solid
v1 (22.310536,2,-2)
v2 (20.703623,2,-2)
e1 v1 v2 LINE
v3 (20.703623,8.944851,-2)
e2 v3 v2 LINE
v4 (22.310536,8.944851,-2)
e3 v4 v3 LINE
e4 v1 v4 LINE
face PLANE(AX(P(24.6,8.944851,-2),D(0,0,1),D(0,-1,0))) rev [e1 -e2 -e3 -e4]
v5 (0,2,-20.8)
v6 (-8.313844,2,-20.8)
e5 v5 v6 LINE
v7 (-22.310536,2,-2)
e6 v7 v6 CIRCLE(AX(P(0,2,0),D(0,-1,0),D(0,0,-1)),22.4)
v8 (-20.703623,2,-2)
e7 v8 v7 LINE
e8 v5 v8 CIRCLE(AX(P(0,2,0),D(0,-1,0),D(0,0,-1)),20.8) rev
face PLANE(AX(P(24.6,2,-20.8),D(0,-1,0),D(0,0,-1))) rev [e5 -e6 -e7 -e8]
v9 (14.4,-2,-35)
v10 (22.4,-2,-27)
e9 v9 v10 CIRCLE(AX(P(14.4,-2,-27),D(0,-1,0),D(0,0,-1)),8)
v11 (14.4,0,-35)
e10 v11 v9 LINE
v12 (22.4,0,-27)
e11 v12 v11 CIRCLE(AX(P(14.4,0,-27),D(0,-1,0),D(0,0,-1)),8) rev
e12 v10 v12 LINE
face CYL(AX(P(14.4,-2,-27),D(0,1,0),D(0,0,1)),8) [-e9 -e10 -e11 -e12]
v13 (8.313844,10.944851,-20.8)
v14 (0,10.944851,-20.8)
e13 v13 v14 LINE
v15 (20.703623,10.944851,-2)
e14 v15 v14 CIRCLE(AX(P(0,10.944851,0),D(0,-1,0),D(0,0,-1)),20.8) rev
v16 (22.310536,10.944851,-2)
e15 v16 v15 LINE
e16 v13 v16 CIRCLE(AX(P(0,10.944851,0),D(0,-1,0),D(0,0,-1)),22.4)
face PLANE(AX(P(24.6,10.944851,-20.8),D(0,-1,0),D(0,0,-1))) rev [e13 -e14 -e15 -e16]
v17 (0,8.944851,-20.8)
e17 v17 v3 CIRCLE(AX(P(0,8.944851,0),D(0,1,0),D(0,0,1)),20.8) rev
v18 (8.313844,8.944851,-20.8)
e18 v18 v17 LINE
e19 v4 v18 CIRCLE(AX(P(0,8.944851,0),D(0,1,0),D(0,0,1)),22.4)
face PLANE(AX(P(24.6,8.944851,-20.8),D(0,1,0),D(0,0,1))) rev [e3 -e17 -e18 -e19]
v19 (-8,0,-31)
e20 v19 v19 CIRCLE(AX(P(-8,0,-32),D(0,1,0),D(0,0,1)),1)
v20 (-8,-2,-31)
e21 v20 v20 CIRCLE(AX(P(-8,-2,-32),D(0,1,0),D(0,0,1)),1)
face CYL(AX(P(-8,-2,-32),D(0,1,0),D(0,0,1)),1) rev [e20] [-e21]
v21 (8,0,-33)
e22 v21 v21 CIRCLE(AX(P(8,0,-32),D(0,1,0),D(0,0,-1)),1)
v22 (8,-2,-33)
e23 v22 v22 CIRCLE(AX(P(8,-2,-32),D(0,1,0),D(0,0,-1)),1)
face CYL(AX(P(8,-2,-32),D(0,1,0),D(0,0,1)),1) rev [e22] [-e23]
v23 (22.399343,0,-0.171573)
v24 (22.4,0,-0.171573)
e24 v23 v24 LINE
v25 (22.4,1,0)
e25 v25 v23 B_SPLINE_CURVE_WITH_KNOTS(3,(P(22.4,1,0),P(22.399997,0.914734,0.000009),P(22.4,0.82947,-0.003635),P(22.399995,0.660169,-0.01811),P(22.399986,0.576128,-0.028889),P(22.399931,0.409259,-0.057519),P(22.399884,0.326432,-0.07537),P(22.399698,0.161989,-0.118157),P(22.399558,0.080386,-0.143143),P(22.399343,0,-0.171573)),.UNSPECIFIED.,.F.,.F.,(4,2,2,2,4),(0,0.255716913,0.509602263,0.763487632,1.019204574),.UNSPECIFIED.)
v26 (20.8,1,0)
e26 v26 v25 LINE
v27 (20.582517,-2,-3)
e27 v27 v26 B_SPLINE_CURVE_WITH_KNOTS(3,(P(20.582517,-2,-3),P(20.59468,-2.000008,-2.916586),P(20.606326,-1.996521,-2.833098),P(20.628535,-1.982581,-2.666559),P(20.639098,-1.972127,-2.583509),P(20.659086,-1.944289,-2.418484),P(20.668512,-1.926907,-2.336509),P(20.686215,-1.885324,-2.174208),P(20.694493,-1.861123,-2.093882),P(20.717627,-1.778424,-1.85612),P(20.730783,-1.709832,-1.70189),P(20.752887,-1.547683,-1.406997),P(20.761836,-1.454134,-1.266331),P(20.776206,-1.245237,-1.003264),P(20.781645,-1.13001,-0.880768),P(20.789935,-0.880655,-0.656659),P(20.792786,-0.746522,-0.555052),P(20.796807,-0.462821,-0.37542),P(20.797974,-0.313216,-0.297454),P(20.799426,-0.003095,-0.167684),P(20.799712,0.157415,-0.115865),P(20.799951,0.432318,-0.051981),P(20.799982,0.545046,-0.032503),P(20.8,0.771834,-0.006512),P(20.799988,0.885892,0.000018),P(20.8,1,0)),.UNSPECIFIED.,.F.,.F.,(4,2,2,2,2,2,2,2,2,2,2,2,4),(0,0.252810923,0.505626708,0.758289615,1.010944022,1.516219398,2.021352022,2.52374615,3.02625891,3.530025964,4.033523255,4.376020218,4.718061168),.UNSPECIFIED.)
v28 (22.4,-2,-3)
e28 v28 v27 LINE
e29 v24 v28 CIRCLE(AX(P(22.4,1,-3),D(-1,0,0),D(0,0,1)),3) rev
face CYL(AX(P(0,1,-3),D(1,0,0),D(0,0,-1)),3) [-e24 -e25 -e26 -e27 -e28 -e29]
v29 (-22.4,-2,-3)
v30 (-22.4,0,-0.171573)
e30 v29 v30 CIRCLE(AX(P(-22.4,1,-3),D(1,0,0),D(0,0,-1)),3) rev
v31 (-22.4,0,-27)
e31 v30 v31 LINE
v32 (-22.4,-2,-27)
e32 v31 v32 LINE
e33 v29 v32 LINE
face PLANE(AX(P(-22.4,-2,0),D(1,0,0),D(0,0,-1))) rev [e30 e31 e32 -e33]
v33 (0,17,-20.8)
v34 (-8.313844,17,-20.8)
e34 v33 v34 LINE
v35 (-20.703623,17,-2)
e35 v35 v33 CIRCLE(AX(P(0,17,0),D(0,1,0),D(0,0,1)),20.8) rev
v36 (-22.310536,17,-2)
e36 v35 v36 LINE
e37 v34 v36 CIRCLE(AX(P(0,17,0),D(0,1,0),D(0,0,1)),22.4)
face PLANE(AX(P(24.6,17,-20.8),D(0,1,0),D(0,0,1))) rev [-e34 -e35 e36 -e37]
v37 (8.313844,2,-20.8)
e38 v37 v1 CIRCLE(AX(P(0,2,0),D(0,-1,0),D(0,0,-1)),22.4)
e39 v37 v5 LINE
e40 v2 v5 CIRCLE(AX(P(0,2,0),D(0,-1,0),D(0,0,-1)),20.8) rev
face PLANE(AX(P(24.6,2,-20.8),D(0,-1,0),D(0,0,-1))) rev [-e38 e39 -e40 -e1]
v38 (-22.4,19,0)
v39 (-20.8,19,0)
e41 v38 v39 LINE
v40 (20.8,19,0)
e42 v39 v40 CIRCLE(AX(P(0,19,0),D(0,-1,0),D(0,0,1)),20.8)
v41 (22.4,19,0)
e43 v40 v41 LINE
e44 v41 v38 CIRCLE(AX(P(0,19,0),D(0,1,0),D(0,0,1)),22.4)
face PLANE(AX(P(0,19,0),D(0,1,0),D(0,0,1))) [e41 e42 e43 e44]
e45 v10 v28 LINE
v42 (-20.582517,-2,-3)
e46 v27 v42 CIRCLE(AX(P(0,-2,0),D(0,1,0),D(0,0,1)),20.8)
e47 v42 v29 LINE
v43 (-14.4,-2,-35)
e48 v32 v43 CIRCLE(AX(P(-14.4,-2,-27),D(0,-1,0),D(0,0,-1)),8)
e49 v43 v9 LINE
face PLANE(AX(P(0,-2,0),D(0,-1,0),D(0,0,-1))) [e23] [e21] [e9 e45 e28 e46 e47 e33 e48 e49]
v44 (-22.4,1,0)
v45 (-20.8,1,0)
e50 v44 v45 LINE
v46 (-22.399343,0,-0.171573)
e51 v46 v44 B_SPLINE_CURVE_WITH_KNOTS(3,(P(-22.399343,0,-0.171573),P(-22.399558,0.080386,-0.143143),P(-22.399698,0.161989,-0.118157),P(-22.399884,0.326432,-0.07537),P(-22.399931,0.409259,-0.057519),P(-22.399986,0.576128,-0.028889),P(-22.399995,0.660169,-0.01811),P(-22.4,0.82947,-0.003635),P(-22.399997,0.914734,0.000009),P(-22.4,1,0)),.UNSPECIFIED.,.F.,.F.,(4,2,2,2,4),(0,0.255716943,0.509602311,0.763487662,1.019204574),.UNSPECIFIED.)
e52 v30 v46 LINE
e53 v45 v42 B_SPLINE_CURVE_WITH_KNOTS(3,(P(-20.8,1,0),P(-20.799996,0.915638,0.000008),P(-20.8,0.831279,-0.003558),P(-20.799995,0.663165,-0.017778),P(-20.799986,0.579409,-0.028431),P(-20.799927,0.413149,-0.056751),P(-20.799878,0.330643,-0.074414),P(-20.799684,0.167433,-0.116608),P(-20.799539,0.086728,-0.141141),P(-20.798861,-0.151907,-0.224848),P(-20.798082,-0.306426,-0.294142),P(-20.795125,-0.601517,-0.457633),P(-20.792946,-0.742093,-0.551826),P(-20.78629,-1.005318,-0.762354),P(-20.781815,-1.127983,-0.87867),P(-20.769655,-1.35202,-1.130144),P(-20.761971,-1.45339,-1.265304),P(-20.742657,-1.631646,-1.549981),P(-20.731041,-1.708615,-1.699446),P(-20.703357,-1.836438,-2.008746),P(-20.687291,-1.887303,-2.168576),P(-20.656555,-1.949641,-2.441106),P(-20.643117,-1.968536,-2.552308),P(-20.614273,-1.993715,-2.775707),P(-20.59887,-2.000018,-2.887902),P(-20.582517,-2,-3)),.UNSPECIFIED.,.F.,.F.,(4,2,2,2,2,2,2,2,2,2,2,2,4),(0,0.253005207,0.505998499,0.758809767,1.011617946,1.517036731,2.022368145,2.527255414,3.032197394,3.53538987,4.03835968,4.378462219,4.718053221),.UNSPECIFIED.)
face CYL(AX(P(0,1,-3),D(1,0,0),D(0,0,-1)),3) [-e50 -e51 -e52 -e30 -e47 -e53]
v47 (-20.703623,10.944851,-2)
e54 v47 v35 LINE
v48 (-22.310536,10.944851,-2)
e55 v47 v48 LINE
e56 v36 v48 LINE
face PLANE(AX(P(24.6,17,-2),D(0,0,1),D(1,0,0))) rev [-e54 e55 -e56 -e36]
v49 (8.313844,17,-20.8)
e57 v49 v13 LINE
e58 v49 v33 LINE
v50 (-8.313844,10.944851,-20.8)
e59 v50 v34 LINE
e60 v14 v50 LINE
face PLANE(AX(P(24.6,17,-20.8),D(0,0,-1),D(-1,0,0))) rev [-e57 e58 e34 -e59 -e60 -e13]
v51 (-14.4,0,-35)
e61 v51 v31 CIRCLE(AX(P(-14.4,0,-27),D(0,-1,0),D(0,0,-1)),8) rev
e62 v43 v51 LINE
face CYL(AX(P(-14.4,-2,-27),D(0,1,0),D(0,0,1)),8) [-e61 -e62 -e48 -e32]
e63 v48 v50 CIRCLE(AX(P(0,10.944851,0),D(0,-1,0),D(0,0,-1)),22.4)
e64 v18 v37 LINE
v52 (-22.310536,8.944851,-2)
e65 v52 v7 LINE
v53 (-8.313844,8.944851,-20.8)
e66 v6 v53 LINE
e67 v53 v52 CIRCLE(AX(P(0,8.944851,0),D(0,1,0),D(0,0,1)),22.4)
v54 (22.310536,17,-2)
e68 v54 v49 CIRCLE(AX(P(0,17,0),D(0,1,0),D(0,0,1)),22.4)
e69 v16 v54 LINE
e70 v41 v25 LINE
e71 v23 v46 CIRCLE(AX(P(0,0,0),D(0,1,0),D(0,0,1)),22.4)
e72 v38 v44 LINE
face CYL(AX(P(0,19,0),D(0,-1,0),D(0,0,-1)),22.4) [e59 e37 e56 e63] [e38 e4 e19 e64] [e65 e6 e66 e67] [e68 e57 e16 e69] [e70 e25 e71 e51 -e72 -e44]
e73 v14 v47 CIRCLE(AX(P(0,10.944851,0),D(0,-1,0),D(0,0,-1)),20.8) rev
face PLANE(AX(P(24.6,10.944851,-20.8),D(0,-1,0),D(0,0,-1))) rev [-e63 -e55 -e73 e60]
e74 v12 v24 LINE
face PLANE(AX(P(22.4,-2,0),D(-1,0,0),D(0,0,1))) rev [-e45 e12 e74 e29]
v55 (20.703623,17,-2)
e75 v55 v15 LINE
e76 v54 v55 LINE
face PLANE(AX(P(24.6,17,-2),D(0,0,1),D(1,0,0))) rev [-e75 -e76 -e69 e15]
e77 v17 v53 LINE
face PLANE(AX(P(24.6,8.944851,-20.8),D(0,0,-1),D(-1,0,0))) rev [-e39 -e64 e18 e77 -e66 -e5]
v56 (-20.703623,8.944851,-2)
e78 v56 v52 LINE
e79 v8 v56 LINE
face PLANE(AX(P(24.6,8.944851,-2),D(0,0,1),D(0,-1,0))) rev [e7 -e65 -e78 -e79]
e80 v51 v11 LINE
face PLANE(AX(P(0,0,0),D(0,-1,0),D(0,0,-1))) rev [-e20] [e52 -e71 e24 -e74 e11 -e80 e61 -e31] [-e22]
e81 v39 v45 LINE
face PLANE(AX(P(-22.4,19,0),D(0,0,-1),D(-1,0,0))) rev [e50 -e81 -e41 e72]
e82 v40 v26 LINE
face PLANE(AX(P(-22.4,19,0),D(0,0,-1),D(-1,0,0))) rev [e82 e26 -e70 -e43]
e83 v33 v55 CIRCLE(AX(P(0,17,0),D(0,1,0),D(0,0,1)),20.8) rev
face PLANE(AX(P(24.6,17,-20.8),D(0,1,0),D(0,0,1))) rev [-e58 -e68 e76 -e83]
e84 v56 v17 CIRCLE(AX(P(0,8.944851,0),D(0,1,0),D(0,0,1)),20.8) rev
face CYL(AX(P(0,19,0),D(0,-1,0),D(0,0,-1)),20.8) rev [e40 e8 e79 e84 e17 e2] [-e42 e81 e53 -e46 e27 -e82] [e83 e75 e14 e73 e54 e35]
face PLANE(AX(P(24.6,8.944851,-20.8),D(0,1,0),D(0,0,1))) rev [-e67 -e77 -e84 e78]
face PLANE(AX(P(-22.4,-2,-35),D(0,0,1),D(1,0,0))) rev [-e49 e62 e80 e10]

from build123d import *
from build123d.topology import SkipClean

# Parameters (mm, degrees)
BOSS_EXTRUDE1_DEPTH = 19
SKETCH2_W           = 44.8
SKETCH2_H           = 35
BOSS_EXTRUDE2_DEPTH = 2
CUT_EXTRUDE1_START  = -2
SKETCH3_R           = 20.8
CUT_EXTRUDE1_DEPTH  = 2
SKETCH4_R           = 1
CUT_EXTRUDE2_DEPTH  = 2
FILLET1_R           = 8
SKETCH5_W           = 18.8
SKETCH5_H           = 6.055148909
SKETCH5_H_2         = 6.944851091
CUT_EXTRUDE3_DEPTH  = 47
FILLET2_START       = -23
FILLET2_DEPTH       = 46


with BuildPart() as part:
    # Sketch1 → Boss-Extrude1 (new body)
    with BuildSketch(Plane(origin=(0, 0, 0), x_dir=(1, 0, 0), z_dir=(0, 1, 0))):
        with BuildLine():
            Line((-22.4, 0), (-20.8, 0))
            ThreePointArc((-20.8, 0), (0, 20.8), (20.8, 0))
            Line((20.8, 0), (22.4, 0))
            ThreePointArc((22.4, 0), (0, 22.4), (-22.4, 0))
        make_face()
    extrude(amount=BOSS_EXTRUDE1_DEPTH)

    # Sketch2 → Boss-Extrude2 (add)
    with BuildSketch(Plane.XZ):
        with Locations((0, -17.5)):
            Rectangle(SKETCH2_W, SKETCH2_H)
    extrude(amount=BOSS_EXTRUDE2_DEPTH)

    # Sketch3 → Cut-Extrude1 (cut)
    with SkipClean():  # the faces are left unmerged after this step: merging them gives an invalid solid
        with BuildSketch(Plane(origin=(0, 0, 0), x_dir=(1, 0, 0), z_dir=(0, 1, 0)).offset(CUT_EXTRUDE1_START)):
            Circle(SKETCH3_R)
        extrude(amount=CUT_EXTRUDE1_DEPTH, mode=Mode.SUBTRACT)
    add(part.part.scale(1), mode=Mode.REPLACE)  # the faces are merged on a copy

    # Sketch4 → Cut-Extrude2 (cut)
    with BuildSketch(Plane(origin=(0, 0, 0), x_dir=(1, 0, 0), z_dir=(0, 1, 0))):
        with Locations(Location((-8, 32, 0), (0, 0, 270))):
            Circle(SKETCH4_R)
        with Locations(Location((8, 32, 0), (0, 0, 90))):
            Circle(SKETCH4_R)
    extrude(amount=-CUT_EXTRUDE2_DEPTH, mode=Mode.SUBTRACT)

    # Fillet1
    fillet1_edges = [part.edges().sort_by_distance(p)[0] for p in [
        (-22.4, -1, -35),
        (22.4, -1, -35),
    ]]
    fillet(fillet1_edges, radius=FILLET1_R)

    # Sketch5 → Cut-Extrude3 (cut)
    with BuildSketch(Plane.ZY.offset(22.4)):
        with Locations((-11.4, 13.972425546)):
            Rectangle(SKETCH5_W, SKETCH5_H)
        with Locations((-11.4, 5.472425546)):
            Rectangle(SKETCH5_W, SKETCH5_H_2)
    extrude(amount=-CUT_EXTRUDE3_DEPTH, mode=Mode.SUBTRACT)

    # Fillet2: read off the stored shape, not the designer's step
    # Fillet2 outline → Fillet2 (cut)
    with BuildSketch(Plane.YZ.offset(FILLET2_START)):
        with BuildLine():
            Line((1, 0), (-2, 0))
            Line((-2, 0), (-2, -3))
            ThreePointArc((-2, -3), (-1.121320344, -0.878679656), (1, 0))
        make_face()
    extrude(amount=FILLET2_DEPTH, mode=Mode.SUBTRACT)


solid = part.part
